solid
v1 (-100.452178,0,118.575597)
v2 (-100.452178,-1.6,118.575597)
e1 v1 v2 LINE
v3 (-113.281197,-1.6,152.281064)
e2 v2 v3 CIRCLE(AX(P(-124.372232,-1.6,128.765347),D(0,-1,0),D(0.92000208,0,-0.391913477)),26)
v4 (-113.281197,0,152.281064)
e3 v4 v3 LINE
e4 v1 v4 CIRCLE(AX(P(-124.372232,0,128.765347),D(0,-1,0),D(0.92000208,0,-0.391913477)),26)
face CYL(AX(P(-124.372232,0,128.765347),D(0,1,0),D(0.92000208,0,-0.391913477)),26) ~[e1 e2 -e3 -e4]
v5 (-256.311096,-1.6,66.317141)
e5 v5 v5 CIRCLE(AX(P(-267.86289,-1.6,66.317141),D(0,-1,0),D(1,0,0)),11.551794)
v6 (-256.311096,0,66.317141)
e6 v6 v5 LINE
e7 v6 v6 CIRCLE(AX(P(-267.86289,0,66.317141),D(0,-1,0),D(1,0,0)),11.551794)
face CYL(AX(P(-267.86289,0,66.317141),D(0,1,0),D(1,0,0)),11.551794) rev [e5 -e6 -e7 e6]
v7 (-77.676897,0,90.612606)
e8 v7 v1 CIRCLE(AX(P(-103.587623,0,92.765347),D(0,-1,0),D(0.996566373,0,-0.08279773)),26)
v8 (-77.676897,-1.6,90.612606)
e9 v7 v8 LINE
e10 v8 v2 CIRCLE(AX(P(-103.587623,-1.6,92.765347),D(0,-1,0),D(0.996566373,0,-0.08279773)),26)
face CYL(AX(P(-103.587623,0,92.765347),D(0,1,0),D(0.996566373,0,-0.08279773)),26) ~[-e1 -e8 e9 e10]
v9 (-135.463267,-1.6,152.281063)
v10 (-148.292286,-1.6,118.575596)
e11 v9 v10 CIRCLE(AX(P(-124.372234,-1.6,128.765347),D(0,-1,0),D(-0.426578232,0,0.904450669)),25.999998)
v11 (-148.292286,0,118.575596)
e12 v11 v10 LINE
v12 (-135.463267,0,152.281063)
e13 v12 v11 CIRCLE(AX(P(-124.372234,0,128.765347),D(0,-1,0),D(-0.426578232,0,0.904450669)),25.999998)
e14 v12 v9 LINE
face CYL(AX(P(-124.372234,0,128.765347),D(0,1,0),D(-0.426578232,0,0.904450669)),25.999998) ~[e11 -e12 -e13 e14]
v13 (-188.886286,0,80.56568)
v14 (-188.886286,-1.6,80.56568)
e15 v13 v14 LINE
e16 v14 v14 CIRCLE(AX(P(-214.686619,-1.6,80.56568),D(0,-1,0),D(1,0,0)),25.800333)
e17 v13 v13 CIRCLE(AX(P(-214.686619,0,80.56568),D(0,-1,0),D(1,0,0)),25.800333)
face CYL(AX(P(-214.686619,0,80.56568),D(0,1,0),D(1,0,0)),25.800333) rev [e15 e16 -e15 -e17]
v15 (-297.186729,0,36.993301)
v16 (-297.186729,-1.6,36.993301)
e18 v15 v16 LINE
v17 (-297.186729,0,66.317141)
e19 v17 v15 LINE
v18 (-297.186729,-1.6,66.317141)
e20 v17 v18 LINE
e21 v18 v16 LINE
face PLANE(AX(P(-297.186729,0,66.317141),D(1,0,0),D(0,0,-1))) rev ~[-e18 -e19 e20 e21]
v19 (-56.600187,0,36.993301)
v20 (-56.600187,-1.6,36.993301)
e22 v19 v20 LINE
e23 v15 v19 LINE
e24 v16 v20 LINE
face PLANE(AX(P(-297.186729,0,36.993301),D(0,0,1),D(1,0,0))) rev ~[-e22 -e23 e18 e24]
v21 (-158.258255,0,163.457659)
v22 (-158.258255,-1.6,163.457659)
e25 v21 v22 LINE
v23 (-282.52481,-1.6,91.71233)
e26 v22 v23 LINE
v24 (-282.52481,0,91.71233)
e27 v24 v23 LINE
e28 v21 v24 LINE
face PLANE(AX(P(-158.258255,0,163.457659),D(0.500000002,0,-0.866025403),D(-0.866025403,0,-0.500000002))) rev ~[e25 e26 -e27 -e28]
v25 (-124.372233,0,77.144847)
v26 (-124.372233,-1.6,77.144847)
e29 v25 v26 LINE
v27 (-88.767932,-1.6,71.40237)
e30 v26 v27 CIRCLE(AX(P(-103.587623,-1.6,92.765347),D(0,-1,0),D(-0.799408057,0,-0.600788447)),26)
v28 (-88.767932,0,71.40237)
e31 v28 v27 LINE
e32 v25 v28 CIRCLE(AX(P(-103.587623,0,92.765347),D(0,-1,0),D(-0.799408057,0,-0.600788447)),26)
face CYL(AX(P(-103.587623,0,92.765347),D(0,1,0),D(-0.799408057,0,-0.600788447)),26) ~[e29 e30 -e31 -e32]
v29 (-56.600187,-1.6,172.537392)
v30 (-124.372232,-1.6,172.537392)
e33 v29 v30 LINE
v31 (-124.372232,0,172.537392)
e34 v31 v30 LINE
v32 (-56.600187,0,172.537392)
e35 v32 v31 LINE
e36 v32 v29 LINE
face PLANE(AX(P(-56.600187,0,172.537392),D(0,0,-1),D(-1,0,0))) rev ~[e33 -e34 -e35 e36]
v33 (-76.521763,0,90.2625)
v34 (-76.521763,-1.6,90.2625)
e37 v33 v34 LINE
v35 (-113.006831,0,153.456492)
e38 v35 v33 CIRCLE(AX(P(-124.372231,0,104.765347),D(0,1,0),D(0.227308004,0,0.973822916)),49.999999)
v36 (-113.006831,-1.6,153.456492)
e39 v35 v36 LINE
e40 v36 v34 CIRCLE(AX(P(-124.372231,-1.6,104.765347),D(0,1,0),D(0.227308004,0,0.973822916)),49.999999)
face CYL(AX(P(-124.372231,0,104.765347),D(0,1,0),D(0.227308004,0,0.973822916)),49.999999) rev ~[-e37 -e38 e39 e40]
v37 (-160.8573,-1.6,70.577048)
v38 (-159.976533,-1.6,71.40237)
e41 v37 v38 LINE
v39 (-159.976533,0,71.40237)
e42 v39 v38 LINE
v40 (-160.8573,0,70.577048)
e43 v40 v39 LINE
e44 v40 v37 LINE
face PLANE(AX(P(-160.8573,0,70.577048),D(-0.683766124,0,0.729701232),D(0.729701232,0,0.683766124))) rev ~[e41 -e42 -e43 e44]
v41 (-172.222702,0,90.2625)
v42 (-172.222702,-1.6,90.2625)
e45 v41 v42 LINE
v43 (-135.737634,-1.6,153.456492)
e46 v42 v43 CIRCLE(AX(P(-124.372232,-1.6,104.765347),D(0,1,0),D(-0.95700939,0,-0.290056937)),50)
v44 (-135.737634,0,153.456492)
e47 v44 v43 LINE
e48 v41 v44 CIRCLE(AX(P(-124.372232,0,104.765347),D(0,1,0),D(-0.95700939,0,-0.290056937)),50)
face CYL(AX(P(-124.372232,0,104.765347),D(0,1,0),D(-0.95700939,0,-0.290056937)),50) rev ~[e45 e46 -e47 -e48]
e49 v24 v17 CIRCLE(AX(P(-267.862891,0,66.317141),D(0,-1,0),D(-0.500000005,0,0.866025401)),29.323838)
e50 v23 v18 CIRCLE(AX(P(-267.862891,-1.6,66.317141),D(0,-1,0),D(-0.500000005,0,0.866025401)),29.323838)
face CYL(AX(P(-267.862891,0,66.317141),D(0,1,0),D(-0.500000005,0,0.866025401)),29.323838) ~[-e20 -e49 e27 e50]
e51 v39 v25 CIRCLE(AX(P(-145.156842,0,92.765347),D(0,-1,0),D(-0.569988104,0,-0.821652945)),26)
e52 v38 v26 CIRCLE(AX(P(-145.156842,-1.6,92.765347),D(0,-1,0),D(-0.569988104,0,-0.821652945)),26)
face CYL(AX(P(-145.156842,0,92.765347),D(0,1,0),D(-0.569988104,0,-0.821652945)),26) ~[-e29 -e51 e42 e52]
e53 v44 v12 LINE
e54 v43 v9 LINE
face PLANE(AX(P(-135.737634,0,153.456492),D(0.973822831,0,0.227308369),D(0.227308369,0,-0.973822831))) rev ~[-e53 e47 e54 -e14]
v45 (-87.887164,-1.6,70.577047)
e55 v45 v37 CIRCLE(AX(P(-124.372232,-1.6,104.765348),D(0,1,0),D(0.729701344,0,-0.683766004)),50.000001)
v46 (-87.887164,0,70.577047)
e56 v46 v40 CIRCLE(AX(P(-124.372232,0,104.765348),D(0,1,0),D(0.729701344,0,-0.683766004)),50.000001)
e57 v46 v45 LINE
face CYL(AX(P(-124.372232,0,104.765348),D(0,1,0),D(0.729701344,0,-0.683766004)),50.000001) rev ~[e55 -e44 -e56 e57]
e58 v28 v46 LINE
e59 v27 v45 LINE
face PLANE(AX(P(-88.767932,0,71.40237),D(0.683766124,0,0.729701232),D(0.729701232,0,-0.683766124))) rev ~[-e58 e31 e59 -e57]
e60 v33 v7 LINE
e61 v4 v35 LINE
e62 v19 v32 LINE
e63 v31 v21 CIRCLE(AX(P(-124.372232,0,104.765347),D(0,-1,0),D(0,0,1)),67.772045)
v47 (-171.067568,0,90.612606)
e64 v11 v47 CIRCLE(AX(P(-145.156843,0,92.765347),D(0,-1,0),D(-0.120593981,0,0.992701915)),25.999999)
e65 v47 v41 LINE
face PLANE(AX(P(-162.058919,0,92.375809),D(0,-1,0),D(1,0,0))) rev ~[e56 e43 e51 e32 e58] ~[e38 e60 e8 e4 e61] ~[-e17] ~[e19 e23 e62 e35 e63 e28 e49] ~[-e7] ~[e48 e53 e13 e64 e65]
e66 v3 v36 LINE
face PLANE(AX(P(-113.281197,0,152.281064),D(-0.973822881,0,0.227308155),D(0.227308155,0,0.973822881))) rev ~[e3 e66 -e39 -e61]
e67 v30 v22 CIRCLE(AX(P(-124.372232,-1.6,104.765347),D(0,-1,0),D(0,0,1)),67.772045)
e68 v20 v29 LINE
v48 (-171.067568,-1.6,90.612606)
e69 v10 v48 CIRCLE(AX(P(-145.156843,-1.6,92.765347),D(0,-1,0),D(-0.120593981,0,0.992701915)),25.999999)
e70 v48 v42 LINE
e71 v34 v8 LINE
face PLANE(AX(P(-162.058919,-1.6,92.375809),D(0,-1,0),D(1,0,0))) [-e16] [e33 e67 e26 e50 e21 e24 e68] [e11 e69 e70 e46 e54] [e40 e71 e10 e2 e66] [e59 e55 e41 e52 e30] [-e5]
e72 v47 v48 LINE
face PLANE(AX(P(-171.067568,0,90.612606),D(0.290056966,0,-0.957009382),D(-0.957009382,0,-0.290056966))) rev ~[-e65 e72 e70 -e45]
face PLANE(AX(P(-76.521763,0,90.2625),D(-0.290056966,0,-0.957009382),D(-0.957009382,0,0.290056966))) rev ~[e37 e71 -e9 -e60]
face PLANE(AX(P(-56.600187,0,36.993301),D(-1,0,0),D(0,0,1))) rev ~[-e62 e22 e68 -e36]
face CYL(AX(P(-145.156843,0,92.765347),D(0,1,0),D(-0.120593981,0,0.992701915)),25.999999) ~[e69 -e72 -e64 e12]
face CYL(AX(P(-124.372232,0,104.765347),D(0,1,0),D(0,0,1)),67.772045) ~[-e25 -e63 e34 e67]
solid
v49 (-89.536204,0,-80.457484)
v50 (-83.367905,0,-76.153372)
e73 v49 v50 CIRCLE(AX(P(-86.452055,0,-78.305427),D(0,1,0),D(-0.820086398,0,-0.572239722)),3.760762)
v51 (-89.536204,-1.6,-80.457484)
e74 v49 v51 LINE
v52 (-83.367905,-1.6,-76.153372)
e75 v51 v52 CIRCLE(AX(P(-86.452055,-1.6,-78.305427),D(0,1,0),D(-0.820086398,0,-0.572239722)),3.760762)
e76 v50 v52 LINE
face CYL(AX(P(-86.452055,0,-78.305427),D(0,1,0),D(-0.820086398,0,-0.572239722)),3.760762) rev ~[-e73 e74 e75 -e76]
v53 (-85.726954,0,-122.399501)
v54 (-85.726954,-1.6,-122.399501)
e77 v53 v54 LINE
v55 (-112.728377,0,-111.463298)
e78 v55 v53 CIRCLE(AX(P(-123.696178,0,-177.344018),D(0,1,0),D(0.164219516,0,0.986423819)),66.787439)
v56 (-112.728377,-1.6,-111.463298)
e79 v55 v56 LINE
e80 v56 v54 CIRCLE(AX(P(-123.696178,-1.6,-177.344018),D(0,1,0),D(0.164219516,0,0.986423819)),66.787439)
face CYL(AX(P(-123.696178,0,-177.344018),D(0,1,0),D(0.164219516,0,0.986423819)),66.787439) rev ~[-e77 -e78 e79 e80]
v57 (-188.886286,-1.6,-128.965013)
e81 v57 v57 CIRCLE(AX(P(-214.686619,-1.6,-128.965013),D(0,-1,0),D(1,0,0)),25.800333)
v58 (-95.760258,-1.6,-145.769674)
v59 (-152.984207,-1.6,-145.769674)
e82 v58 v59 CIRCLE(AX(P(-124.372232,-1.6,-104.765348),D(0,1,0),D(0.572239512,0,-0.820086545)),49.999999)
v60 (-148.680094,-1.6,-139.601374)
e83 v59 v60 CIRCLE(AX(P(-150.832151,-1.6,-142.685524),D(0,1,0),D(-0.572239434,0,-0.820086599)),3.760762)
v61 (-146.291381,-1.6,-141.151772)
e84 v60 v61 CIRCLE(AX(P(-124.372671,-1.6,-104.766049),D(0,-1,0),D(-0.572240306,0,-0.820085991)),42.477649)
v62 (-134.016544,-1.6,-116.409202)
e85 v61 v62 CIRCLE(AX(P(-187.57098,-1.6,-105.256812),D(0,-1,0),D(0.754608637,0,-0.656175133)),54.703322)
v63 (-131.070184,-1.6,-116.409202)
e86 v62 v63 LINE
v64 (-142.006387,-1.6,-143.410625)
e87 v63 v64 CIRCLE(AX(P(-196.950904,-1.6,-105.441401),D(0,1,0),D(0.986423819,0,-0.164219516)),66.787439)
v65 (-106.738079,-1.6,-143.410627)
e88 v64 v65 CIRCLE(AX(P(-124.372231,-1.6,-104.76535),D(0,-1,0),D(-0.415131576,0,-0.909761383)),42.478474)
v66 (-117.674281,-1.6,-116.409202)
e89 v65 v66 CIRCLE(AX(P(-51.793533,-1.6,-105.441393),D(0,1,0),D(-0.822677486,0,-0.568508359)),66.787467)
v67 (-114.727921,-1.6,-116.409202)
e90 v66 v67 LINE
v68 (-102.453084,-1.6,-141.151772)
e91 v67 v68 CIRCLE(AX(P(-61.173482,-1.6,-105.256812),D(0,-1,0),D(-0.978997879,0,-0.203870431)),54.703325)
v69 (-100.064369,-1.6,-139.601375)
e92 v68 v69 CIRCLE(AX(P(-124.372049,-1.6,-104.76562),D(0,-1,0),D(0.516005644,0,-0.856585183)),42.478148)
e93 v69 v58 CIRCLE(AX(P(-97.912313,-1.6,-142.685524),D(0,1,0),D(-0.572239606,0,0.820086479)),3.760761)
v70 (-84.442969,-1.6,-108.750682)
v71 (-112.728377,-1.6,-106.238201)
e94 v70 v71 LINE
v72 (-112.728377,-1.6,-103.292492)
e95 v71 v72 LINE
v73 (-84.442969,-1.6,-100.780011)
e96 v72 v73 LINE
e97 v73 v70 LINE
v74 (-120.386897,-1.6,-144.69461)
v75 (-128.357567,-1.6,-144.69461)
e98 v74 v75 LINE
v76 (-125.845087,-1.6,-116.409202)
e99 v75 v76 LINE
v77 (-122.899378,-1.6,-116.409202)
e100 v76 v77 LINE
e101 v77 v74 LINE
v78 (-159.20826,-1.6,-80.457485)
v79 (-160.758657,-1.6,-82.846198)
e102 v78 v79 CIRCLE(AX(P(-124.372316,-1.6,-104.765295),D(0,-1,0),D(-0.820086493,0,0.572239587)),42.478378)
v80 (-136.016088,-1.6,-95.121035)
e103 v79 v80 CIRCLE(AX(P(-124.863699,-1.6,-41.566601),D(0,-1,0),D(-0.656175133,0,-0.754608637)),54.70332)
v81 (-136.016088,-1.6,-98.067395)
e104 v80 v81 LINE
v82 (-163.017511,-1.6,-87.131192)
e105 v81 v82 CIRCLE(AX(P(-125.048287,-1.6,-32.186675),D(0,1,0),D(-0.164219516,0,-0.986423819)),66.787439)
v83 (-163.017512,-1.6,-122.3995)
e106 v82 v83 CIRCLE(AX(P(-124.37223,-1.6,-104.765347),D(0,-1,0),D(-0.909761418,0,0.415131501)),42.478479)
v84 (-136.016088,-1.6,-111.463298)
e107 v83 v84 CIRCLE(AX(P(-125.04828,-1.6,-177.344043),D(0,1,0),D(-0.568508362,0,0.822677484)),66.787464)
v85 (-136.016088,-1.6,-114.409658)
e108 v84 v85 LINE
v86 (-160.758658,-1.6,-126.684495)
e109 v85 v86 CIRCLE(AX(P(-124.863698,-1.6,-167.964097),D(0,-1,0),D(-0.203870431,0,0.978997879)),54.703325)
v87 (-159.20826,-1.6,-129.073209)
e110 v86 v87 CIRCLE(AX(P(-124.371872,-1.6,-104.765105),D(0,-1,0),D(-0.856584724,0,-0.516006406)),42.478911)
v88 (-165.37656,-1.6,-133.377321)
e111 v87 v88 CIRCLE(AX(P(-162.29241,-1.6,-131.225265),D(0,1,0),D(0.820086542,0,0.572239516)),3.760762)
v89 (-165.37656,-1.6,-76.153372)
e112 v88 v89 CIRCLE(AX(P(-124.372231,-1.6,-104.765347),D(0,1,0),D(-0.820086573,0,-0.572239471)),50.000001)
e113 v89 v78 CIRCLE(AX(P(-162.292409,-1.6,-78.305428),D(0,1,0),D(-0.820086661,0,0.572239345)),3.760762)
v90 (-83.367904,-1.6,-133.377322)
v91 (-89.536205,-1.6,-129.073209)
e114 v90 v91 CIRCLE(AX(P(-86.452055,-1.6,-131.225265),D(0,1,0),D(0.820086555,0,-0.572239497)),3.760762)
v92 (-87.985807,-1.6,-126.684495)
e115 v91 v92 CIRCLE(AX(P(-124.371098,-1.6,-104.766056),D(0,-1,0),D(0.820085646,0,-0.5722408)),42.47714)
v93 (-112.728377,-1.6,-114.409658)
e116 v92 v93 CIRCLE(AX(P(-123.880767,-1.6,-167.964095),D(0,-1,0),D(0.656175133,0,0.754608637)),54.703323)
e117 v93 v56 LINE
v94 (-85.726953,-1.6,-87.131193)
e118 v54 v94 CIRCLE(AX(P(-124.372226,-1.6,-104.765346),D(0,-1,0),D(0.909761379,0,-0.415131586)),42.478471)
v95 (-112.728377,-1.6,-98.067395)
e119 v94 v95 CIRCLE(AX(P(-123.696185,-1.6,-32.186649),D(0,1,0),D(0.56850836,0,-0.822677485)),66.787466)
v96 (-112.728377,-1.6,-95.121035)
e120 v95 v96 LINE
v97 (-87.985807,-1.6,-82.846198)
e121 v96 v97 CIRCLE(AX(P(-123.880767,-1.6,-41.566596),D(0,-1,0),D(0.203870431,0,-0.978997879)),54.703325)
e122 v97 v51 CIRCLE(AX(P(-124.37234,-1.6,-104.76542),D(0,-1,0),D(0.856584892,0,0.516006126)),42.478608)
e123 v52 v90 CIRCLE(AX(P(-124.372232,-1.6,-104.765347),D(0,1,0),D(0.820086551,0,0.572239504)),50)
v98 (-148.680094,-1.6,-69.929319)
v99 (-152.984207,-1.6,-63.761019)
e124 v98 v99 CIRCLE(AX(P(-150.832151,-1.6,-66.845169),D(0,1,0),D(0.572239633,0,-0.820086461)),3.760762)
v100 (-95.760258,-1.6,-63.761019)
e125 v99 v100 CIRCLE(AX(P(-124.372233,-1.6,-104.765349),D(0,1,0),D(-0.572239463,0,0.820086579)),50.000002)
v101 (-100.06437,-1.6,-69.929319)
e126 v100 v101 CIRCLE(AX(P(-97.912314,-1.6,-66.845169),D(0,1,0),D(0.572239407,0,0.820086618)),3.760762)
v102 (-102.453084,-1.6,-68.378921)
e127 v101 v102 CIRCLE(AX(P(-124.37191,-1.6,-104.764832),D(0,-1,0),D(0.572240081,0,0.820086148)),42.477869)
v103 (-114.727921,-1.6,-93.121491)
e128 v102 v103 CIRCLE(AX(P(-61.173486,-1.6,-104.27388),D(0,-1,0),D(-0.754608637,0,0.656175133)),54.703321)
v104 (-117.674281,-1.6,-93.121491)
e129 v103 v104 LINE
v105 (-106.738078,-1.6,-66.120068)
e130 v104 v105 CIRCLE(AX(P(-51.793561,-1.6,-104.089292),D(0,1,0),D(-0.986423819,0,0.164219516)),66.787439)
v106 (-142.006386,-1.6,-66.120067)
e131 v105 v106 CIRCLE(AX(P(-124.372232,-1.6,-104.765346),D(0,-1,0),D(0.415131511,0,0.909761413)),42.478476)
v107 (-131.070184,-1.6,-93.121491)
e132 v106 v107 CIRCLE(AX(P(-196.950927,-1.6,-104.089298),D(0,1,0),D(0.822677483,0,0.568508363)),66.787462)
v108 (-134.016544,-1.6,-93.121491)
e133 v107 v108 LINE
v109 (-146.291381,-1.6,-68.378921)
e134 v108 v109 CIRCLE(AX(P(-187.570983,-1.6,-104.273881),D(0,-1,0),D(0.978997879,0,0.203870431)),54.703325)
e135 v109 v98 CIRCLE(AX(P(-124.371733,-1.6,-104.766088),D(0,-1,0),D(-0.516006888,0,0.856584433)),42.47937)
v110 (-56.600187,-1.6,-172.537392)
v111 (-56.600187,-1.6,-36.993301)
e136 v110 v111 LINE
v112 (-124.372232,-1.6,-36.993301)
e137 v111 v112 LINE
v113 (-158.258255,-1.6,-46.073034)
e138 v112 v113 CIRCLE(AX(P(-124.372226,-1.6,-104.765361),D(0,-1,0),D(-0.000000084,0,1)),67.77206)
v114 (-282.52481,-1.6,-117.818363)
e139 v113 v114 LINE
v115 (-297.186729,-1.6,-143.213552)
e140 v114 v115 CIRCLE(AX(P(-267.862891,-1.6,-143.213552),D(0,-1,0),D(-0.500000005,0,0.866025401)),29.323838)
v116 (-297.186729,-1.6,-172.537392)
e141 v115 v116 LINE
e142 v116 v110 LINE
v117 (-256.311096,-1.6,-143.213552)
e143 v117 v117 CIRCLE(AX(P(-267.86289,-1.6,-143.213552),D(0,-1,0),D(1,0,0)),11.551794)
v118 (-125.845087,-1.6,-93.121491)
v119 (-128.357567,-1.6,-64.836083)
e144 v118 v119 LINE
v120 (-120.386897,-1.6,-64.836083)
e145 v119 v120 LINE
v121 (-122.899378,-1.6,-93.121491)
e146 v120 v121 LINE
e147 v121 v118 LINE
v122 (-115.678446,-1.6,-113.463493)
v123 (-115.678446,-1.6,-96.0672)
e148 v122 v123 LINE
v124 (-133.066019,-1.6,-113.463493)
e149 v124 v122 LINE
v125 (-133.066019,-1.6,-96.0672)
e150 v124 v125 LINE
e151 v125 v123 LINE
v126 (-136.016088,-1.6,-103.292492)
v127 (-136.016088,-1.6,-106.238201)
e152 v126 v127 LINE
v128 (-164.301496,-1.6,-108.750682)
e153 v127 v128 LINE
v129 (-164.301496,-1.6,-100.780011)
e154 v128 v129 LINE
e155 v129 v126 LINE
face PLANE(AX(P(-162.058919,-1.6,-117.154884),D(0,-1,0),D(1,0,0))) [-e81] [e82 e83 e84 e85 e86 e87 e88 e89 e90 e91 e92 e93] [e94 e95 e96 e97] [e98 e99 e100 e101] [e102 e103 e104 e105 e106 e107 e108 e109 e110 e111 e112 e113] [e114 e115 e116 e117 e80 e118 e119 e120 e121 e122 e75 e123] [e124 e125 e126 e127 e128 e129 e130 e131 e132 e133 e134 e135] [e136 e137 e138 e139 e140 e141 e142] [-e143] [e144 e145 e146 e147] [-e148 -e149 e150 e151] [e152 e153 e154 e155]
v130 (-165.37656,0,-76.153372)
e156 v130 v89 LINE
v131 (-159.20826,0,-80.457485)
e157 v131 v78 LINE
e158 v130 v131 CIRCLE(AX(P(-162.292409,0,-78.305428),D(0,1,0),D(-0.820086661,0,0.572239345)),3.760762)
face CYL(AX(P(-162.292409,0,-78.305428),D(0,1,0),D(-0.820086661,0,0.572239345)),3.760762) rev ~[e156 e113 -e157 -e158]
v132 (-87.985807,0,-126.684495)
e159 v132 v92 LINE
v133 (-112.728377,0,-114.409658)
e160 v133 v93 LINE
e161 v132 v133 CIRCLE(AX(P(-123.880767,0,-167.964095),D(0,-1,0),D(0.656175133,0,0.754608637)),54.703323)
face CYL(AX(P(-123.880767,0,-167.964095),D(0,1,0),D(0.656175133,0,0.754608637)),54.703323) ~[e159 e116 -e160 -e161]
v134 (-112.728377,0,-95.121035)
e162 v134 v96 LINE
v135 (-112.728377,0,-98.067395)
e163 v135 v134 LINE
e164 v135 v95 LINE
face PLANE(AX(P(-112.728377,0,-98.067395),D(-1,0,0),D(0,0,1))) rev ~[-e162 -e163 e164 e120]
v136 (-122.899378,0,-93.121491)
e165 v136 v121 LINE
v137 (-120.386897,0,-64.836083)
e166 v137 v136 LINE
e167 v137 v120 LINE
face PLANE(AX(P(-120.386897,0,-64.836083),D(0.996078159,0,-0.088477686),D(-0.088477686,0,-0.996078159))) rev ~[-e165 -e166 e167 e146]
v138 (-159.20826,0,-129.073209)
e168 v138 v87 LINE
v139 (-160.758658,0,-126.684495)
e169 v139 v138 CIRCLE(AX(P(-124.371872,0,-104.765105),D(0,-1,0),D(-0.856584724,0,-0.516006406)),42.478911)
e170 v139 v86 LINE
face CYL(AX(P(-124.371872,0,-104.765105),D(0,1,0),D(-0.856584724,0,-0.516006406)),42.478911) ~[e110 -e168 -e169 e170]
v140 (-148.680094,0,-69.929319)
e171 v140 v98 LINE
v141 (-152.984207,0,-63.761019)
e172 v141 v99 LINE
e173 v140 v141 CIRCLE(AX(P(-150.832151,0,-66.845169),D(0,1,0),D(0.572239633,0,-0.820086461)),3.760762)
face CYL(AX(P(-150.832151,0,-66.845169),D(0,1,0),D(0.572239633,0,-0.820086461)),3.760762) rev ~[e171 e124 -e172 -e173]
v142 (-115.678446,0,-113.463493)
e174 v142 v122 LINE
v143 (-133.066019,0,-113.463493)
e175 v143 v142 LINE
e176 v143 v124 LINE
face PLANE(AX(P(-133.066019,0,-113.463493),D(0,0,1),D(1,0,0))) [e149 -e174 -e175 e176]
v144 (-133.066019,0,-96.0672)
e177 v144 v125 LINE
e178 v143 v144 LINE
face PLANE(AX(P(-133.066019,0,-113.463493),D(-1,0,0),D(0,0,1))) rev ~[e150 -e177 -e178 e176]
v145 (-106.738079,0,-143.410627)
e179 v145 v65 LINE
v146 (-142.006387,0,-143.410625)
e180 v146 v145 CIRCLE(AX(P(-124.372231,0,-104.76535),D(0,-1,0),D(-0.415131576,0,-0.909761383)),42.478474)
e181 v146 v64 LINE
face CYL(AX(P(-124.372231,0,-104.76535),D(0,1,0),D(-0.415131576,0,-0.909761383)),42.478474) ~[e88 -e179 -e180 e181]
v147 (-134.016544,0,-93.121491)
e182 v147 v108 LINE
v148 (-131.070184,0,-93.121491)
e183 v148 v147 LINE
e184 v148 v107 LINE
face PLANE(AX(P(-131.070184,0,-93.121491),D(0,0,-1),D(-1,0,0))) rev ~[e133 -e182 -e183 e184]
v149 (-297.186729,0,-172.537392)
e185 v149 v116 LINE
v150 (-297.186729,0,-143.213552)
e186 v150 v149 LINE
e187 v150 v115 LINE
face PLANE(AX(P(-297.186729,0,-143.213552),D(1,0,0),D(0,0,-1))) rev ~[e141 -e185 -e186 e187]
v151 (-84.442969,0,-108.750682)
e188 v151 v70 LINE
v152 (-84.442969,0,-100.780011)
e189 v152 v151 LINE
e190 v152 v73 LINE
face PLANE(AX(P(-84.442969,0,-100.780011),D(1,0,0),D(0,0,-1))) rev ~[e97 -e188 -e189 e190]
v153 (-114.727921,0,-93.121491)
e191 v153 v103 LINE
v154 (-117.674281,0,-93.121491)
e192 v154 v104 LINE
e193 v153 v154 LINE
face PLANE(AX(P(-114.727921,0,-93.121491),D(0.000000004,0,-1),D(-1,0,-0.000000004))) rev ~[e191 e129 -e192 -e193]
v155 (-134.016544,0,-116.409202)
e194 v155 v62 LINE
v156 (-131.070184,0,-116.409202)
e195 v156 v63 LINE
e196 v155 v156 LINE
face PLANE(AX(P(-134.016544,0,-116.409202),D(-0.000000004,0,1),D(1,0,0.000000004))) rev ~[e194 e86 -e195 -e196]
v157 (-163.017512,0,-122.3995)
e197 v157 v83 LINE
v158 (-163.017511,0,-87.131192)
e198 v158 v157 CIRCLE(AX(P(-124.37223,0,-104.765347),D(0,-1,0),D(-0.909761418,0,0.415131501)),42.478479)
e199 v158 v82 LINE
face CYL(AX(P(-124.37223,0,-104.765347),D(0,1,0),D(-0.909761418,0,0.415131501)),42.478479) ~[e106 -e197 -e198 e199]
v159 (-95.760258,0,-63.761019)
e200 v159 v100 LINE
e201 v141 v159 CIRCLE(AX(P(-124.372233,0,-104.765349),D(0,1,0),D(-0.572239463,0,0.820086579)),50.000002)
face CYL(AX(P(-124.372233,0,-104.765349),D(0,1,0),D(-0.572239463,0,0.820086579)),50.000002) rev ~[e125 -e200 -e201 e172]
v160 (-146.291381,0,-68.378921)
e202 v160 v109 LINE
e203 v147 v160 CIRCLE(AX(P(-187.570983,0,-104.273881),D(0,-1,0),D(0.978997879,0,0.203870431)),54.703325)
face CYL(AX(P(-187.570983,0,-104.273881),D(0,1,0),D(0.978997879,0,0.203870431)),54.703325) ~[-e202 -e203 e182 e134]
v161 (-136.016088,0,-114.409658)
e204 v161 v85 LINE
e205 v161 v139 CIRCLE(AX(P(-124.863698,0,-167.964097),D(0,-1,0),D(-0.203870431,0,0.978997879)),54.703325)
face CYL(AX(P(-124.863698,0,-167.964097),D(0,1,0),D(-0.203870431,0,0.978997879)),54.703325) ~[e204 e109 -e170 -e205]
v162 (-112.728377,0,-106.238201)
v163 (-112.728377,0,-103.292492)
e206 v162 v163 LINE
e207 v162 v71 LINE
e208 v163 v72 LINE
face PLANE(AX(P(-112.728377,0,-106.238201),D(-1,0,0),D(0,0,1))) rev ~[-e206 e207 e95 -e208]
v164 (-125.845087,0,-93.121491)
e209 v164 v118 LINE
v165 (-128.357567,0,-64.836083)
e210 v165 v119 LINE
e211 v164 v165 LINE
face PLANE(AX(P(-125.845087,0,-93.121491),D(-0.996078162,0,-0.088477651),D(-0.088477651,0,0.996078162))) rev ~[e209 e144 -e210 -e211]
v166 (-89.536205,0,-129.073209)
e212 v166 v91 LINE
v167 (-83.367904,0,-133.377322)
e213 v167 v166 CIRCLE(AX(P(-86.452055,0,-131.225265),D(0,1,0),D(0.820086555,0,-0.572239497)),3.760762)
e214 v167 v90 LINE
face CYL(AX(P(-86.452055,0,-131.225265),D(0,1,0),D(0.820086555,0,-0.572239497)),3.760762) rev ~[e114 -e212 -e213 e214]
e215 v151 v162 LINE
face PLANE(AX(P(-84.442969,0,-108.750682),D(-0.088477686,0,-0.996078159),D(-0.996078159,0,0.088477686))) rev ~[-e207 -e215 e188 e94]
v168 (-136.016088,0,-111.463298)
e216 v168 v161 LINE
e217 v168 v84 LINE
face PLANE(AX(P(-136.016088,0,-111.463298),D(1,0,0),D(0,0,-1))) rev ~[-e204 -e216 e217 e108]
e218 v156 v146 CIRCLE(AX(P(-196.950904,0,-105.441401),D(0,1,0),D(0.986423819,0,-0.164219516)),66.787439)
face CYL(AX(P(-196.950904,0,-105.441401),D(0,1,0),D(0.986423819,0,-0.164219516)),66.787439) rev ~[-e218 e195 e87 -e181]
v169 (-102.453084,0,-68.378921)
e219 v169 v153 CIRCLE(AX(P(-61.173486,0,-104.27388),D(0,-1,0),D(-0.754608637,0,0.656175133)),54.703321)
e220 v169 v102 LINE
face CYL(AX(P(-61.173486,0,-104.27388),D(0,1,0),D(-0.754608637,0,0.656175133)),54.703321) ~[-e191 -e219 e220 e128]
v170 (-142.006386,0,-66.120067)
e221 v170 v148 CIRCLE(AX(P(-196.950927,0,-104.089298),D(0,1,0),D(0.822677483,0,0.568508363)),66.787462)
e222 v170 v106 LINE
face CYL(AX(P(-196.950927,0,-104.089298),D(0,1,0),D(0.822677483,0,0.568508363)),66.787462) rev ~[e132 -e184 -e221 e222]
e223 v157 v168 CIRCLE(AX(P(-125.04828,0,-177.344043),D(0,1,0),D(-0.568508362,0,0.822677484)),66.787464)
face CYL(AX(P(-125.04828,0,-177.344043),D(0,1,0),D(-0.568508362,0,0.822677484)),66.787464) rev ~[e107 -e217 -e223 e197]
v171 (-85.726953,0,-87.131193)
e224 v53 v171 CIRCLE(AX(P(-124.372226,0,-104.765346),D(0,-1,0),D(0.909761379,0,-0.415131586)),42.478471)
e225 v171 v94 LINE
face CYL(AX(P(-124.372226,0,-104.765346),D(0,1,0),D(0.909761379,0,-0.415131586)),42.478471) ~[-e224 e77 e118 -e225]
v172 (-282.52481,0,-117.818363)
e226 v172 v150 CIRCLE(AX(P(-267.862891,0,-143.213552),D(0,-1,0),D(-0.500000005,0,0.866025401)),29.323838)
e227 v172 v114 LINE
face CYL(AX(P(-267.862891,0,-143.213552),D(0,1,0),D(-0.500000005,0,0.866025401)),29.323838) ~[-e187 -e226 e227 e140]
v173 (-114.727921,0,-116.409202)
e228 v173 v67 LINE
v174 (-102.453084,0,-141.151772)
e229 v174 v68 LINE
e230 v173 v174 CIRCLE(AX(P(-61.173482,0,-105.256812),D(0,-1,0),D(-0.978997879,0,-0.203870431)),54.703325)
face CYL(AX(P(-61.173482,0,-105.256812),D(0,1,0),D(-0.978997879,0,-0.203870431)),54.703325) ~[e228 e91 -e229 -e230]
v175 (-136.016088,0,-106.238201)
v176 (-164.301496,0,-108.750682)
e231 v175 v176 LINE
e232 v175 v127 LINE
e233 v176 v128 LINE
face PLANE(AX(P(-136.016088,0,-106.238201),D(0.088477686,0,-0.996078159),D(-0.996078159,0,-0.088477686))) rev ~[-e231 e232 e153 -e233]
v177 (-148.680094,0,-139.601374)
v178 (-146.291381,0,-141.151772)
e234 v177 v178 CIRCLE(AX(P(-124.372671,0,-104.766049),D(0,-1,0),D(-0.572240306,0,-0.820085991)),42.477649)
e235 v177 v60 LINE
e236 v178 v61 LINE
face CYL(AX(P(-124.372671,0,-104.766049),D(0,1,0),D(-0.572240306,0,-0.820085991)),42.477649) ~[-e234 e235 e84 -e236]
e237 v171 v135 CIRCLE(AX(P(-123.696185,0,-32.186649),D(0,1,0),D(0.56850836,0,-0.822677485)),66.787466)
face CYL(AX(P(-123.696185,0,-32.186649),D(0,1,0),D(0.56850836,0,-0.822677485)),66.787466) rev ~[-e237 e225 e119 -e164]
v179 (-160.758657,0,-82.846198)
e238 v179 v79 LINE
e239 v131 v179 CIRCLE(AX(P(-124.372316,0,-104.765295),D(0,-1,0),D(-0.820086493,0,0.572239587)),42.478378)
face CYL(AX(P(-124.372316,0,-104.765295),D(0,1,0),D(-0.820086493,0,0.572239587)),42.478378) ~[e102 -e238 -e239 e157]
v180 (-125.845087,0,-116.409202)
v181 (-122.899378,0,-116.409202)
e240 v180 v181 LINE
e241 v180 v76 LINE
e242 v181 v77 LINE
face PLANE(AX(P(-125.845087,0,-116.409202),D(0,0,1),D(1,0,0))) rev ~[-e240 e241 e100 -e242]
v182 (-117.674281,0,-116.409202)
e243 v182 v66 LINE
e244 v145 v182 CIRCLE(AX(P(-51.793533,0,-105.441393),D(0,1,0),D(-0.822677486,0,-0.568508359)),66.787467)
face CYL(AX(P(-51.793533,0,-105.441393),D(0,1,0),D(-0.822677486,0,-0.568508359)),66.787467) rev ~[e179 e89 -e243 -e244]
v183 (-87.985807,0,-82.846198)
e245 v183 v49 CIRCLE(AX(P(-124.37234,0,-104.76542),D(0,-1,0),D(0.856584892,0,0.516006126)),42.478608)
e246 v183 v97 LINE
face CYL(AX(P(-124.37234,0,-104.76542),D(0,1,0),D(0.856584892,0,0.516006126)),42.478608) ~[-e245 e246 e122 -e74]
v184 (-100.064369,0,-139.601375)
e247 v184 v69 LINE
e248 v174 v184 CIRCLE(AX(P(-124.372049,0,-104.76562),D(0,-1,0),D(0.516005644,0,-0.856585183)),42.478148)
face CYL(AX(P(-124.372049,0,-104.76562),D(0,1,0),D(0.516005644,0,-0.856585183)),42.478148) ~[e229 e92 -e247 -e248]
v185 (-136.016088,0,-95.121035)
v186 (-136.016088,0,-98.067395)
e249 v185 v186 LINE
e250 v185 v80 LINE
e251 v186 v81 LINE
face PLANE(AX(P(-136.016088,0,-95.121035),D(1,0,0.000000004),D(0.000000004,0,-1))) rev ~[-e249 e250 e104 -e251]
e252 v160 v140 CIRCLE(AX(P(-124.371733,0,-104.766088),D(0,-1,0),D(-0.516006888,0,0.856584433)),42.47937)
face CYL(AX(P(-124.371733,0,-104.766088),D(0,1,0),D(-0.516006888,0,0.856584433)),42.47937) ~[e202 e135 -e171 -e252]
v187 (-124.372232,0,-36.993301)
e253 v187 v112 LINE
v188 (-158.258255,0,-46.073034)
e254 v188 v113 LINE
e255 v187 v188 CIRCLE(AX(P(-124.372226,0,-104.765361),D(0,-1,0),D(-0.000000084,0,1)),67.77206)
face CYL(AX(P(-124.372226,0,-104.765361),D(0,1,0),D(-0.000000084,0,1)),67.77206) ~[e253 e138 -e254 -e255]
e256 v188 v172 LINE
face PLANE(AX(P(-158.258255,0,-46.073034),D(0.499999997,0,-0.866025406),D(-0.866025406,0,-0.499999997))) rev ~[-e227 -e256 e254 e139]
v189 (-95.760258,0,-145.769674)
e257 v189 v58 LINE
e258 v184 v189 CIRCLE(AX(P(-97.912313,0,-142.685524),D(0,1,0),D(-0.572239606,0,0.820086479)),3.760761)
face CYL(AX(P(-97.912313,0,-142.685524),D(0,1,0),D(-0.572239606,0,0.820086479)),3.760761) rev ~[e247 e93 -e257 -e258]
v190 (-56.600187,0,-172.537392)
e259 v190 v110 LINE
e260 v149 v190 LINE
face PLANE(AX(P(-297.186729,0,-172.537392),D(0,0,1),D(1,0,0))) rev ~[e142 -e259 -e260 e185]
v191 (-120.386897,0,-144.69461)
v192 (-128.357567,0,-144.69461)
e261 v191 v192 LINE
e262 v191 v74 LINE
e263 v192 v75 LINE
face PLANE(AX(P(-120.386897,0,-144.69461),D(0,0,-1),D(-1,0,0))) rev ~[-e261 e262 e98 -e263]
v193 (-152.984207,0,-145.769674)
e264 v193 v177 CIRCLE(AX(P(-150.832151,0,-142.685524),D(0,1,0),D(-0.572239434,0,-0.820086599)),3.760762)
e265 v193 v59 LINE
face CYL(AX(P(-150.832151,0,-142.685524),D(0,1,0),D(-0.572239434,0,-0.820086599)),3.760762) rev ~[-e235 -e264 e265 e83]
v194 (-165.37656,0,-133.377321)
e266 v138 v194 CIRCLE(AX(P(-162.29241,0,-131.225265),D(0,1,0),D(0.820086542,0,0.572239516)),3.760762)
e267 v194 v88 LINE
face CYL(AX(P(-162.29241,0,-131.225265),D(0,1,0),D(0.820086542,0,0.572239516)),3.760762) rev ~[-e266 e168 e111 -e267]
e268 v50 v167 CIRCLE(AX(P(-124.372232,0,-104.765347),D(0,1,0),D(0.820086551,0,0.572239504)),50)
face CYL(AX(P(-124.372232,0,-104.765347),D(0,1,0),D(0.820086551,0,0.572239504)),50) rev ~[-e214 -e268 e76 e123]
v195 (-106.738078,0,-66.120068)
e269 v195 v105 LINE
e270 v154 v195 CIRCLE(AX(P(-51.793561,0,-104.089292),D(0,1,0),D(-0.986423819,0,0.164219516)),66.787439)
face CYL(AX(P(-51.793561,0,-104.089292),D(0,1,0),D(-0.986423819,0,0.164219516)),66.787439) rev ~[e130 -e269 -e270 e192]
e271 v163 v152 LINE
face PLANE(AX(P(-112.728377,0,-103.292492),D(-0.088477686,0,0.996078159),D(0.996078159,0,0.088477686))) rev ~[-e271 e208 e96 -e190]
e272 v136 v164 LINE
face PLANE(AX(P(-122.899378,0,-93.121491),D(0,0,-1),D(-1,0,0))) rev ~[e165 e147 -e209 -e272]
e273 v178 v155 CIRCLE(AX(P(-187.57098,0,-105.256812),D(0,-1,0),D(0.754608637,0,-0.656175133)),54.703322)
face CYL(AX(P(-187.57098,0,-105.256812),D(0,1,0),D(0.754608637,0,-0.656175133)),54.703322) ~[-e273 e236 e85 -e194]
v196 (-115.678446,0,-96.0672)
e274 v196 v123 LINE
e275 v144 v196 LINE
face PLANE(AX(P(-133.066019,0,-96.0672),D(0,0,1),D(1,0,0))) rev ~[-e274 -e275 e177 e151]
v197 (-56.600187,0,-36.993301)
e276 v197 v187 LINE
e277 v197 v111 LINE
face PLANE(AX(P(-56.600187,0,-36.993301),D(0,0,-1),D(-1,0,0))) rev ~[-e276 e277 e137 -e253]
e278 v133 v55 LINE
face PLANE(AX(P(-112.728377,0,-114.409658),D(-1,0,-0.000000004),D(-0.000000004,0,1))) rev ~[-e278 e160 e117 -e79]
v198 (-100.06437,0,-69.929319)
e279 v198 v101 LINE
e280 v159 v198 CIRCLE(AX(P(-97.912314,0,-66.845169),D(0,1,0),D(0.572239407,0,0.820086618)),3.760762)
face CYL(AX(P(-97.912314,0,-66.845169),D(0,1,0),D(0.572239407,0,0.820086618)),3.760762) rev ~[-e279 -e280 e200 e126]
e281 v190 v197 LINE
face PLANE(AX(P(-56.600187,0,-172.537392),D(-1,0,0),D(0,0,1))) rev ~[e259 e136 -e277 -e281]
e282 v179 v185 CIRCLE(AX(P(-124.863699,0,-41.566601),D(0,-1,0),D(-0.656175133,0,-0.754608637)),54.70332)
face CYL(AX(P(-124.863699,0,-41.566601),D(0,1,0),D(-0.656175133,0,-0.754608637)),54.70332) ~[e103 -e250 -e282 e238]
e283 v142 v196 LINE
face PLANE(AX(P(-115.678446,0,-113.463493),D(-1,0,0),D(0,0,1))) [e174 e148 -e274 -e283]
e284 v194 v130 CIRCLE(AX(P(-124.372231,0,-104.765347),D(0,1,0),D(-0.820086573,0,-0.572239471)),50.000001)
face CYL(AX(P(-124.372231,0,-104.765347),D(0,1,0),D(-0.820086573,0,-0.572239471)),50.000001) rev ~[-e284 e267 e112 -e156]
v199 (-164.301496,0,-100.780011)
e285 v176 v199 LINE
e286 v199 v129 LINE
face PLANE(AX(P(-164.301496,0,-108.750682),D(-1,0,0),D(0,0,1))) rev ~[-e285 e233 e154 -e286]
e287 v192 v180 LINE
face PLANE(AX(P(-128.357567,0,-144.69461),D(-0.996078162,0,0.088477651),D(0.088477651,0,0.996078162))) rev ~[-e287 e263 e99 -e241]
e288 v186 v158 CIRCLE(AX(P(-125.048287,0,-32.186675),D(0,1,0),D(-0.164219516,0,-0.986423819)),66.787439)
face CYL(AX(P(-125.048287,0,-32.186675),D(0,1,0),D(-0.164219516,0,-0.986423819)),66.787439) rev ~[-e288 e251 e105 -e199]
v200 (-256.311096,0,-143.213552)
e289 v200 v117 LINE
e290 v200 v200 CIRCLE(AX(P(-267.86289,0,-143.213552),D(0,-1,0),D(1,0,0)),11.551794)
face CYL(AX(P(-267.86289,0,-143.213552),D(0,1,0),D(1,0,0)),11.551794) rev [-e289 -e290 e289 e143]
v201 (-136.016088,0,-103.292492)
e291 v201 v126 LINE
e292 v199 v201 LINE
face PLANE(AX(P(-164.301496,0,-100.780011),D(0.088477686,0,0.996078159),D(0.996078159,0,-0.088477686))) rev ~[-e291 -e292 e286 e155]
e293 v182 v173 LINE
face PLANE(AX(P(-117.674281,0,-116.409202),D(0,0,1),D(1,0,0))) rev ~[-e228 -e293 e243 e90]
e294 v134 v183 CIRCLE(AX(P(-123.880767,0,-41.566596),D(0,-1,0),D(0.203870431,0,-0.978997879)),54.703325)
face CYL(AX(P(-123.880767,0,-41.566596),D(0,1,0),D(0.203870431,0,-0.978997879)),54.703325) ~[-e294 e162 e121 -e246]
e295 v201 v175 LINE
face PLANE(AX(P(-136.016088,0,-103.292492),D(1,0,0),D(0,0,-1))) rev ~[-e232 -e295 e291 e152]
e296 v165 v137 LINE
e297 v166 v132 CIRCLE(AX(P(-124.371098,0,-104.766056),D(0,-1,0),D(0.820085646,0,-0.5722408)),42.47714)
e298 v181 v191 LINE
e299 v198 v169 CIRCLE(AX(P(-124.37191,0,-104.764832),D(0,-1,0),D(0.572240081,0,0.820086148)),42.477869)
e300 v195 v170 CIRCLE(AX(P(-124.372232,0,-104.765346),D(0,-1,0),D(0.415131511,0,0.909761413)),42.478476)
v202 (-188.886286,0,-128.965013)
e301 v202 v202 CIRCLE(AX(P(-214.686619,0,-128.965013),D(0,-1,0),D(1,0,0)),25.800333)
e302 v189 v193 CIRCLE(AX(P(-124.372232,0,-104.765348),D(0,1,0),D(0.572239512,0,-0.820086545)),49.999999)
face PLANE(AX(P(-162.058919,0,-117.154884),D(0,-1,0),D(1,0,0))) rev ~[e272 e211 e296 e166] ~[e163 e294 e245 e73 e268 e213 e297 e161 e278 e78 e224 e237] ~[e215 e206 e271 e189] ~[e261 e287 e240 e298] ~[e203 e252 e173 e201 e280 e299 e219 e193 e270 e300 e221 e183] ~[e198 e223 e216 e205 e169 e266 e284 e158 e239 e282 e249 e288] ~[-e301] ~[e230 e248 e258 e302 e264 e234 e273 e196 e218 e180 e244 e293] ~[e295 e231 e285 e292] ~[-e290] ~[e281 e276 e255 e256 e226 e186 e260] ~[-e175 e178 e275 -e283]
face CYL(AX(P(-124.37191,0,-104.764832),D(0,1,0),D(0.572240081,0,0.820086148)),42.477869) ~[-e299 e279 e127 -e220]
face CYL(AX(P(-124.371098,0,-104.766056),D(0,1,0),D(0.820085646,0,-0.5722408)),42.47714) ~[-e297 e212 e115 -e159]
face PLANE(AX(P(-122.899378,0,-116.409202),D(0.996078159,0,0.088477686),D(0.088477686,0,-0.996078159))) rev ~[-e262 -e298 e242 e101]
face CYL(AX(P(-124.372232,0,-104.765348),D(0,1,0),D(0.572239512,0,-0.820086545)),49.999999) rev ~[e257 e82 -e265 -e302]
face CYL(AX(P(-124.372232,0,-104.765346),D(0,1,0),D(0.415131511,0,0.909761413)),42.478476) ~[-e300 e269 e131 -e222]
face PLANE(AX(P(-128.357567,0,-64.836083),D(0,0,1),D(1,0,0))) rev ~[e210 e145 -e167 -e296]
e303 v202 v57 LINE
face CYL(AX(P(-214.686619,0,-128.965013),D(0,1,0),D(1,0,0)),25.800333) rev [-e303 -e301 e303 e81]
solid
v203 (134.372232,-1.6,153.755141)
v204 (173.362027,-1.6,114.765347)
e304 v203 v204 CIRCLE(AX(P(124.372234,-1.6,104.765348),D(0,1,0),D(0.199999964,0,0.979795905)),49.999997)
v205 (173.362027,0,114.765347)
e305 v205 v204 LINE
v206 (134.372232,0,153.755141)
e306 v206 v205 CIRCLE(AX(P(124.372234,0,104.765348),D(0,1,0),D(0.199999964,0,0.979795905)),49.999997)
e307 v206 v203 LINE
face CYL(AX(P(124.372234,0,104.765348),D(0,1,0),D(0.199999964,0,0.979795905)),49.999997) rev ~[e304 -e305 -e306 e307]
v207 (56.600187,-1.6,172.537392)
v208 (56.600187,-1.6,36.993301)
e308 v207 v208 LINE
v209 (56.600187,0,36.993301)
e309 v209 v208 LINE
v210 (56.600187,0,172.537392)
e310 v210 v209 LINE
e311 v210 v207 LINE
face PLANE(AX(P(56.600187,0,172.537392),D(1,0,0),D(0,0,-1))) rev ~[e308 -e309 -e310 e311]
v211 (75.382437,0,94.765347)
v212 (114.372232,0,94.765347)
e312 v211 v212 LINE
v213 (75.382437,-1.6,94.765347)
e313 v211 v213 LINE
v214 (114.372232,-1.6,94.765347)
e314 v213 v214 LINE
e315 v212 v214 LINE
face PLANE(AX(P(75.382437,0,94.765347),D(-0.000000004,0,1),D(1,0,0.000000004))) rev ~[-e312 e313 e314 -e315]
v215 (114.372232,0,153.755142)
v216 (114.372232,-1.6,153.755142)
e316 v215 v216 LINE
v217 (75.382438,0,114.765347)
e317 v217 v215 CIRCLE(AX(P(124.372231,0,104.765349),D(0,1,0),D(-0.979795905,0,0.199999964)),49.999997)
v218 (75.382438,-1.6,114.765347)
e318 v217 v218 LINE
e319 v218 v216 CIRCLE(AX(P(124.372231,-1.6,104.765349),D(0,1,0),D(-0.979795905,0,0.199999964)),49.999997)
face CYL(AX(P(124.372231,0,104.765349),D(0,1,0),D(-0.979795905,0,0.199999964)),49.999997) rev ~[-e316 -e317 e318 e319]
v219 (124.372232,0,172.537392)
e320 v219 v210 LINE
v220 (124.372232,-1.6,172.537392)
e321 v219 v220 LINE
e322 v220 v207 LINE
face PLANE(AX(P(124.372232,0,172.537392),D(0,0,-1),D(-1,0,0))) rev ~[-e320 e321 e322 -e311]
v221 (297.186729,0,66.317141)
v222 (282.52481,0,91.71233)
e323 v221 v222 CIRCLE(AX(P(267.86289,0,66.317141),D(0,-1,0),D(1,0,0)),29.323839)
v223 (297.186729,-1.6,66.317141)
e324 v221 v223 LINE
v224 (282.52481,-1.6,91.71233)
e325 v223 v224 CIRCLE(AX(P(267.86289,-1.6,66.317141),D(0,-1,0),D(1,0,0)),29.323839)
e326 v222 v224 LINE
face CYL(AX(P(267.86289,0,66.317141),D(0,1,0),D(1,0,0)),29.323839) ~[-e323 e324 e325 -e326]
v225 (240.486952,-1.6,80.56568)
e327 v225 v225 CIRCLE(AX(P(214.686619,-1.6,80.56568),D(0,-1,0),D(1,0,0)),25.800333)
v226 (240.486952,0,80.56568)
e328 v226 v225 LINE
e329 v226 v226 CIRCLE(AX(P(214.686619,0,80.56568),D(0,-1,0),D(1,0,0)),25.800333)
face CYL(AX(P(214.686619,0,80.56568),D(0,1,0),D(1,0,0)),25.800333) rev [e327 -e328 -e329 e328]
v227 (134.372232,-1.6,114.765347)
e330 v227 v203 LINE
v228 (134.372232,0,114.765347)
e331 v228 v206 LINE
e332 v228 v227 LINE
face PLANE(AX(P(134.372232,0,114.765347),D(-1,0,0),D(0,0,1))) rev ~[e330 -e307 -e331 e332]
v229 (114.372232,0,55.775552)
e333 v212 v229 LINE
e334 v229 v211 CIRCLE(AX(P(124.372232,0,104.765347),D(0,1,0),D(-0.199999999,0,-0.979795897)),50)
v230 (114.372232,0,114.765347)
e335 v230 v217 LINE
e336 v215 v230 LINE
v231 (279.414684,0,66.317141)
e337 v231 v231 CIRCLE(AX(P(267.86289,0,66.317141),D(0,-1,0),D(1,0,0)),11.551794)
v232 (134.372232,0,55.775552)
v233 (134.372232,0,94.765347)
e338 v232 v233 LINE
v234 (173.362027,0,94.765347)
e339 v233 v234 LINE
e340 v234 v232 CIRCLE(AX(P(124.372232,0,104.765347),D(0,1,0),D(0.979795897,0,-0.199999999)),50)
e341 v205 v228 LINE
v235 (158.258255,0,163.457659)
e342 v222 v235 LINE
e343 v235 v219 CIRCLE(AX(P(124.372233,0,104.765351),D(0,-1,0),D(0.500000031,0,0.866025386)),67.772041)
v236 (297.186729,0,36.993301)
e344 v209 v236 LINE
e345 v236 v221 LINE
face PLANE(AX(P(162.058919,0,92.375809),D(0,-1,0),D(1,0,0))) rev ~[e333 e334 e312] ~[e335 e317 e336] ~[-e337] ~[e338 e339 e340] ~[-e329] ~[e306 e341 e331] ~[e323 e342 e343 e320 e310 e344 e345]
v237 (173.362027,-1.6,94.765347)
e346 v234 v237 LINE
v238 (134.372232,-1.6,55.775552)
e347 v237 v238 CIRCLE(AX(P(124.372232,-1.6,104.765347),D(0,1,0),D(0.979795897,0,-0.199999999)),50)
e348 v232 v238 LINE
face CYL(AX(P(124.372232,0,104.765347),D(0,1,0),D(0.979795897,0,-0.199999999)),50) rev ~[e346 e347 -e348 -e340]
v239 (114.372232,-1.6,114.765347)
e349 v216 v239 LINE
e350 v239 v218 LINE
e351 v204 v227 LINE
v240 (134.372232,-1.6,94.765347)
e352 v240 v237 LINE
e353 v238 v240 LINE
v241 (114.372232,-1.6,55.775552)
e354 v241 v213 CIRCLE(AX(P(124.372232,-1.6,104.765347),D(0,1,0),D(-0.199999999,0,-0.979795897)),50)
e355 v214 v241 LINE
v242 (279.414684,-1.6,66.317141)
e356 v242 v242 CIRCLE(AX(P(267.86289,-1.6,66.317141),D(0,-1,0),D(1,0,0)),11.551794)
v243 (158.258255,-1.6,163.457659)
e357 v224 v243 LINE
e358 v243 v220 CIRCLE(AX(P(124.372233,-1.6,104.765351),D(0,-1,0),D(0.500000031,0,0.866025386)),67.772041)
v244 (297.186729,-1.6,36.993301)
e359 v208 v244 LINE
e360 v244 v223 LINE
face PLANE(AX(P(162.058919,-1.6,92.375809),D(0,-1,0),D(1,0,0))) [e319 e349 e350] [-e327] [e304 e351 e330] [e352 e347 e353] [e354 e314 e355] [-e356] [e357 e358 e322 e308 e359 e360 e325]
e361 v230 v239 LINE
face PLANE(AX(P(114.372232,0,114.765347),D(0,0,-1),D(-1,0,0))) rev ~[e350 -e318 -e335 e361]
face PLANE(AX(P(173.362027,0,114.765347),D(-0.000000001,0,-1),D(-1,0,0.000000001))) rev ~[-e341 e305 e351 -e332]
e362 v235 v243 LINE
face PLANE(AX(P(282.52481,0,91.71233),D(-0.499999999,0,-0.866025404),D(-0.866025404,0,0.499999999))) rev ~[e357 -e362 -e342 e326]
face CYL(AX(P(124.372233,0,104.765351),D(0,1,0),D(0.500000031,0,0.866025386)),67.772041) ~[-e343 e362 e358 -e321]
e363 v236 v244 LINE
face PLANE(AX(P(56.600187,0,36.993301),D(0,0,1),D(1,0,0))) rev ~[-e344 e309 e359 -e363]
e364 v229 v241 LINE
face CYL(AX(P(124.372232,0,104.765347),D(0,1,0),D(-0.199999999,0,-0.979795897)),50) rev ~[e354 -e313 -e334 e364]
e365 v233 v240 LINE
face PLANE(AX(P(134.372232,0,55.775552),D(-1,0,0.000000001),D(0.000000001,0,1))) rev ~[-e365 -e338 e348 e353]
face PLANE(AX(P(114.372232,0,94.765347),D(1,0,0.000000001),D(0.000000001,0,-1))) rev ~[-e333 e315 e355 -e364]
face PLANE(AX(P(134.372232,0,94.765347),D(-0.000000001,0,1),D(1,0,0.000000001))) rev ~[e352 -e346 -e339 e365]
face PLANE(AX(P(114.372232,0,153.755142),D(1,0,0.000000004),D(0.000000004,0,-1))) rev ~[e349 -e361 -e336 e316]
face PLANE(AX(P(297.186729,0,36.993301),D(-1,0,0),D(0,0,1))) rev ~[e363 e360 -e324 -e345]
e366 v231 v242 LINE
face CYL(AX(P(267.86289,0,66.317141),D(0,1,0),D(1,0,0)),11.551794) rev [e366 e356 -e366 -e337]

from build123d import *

# Parameters (mm, degrees)
F0_R     = 11.551794
F0_R_2   = 25.800333
F1_DEPTH = 1.6
F2_DEPTH = 1.6
F0_W     = 17.387573
F0_H     = 17.396293
F3_DEPTH = 1.6


# Not quite as in the source:
# - ends of sketch curves that miss each other by under 0.0002 mm in the source are joined


with BuildPart() as f1:
    # F0 (on Front) → F1 (new body)
    with BuildSketch(Plane.XZ):
        with BuildLine():
            Line((-297.186729, 36.993301), (-56.600187, 36.993301))
            Line((-56.600187, 36.993301), (-56.600187, 172.537392))
            Line((-56.600187, 172.537392), (-124.372232, 172.537392))
            ThreePointArc((-124.372232, 172.537392), (-141.9129283344, 170.2281154687), (-158.2582551506, 163.4576592608))
            Line((-158.2582551506, 163.4576592608), (-282.52481, 91.71233))
            ThreePointArc((-282.52481, 91.71233), (-293.2580796825, 80.979060202), (-297.186729, 66.317141))
            Line((-297.186729, 66.317141), (-297.186729, 36.993301))
        make_face()
        with Locations((-267.86289, 66.317141)):
            Circle(F0_R, mode=Mode.SUBTRACT)
        with Locations((-214.686619, 80.56568)):
            Circle(F0_R_2, mode=Mode.SUBTRACT)
        with BuildLine():
            ThreePointArc((-159.9765326971, 71.4023704367), (-141.016905476, 67.0970606221), (-124.3722325089, 77.1448473824))
            ThreePointArc((-124.3722325089, 77.1448473824), (-107.7275592275, 67.0970605743), (-88.7679323029, 71.4023704367))
            Line((-88.7679323029, 71.4023704367), (-87.887164, 70.577047))
            ThreePointArc((-87.887164, 70.577047), (-124.3722323419, 54.765347), (-160.8573001475, 70.5770477988))
            Line((-160.8573001475, 70.5770477988), (-159.9765326971, 71.4023704367))
        make_face(mode=Mode.SUBTRACT)
        with BuildLine():
            ThreePointArc((-172.2227015184, 90.262500146), (-167.6735024781, 129.7653464996), (-135.7376340818, 153.4564923503))
            Line((-135.7376340818, 153.4564923503), (-135.463267, 152.281063))
            ThreePointArc((-135.463267, 152.281063), (-148.6715885036, 138.0141995511), (-148.2922859978, 118.5755964269))
            ThreePointArc((-148.2922859978, 118.5755964269), (-165.3162621194, 109.1847800125), (-171.0675676999, 90.6126060249))
            Line((-171.0675676999, 90.6126060249), (-172.2227015184, 90.262500146))
        make_face(mode=Mode.SUBTRACT)
        with BuildLine():
            ThreePointArc((-77.6768973001, 90.6126060249), (-83.4282028806, 109.1847800125), (-100.4521779276, 118.5755965958))
            ThreePointArc((-100.4521779276, 118.5755965958), (-100.0728755876, 138.0141997906), (-113.2811974601, 152.2810641448))
            Line((-113.2811974601, 152.2810641448), (-113.006831, 153.456492))
            ThreePointArc((-113.006831, 153.456492), (-81.0709616928, 129.7653467957), (-76.5217625658, 90.2624998684))
            Line((-76.5217625658, 90.2624998684), (-77.6768973001, 90.6126060249))
        make_face(mode=Mode.SUBTRACT)
    extrude(amount=F1_DEPTH)


with BuildPart() as f2:
    # F0 (on Front) → F2 (new body)
    with BuildSketch(Plane.XZ):
        with BuildLine():
            ThreePointArc((297.186729, 66.317141), (293.2580796825, 80.979060202), (282.524810096, 91.7123301664))
            Line((282.524810096, 91.7123301664), (158.258255, 163.457659))
            ThreePointArc((158.258255, 163.457659), (141.9129283344, 170.2281154687), (124.372232, 172.537392))
            Line((124.372232, 172.537392), (56.600187, 172.537392))
            Line((56.600187, 172.537392), (56.600187, 36.993301))
            Line((56.600187, 36.993301), (297.186729, 36.993301))
            Line((297.186729, 36.993301), (297.186729, 66.317141))
        make_face()
        with BuildLine():
            ThreePointArc((114.3722320283, 55.7755521386), (89.0168930114, 69.41000787), (75.3824371786, 94.7653468323))
            Line((75.3824371786, 94.7653468323), (114.372232, 94.765347))
            Line((114.372232, 94.765347), (114.3722320283, 55.7755521386))
        make_face(mode=Mode.SUBTRACT)
        with BuildLine():
            ThreePointArc((173.3620268614, 94.7653470283), (159.7275710593, 69.4100079407), (134.3722319717, 55.7755521386))
            Line((134.3722319717, 55.7755521386), (134.372232, 94.765347))
            Line((134.372232, 94.765347), (173.3620268614, 94.7653470283))
        make_face(mode=Mode.SUBTRACT)
        with Locations((214.686619, 80.56568)):
            Circle(F0_R_2, mode=Mode.SUBTRACT)
        with Locations((267.86289, 66.317141)):
            Circle(F0_R, mode=Mode.SUBTRACT)
        with BuildLine():
            Line((114.372232, 114.765347), (75.382438, 114.765347))
            ThreePointArc((75.382438, 114.765347), (89.0168929407, 140.1206860593), (114.3722318323, 153.7551418214))
            Line((114.3722318323, 153.7551418214), (114.372232, 114.765347))
        make_face(mode=Mode.SUBTRACT)
        with BuildLine():
            Line((134.372232, 114.765347), (134.372232, 153.755141))
            ThreePointArc((134.372232, 153.755141), (159.72757113, 140.1206859886), (173.3620268614, 114.7653469717))
            Line((173.3620268614, 114.7653469717), (134.372232, 114.765347))
        make_face(mode=Mode.SUBTRACT)
    extrude(amount=F2_DEPTH)


with BuildPart() as f3:
    # F0 (on Front) → F3 (new body)
    with BuildSketch(Plane.XZ):
        with BuildLine():
            Line((-297.186729, -172.537392), (-56.600187, -172.537392))
            Line((-56.600187, -172.537392), (-56.600187, -36.993301))
            Line((-56.600187, -36.993301), (-124.372232, -36.993301))
            ThreePointArc((-124.372232, -36.993301), (-141.9129280929, -39.3025784666), (-158.2582547176, -46.0730344892))
            Line((-158.2582547176, -46.0730344892), (-282.52481, -117.818363))
            ThreePointArc((-282.52481, -117.818363), (-293.2580796825, -128.551632798), (-297.186729, -143.213552))
            Line((-297.186729, -143.213552), (-297.186729, -172.537392))
        make_face()
        with Locations((-267.86289, -143.213552)):
            Circle(F0_R, mode=Mode.SUBTRACT)
        with Locations((-214.686619, -128.965013)):
            Circle(F0_R_2, mode=Mode.SUBTRACT)
        with BuildLine():
            Line((-136.016088, -111.463298), (-136.016088, -114.409658))
            ThreePointArc((-136.016088, -114.409658), (-149.1748311091, -118.9597856001), (-160.7586581585, -126.6844948177))
            ThreePointArc((-160.7586581585, -126.6844948177), (-160.0034818521, -127.891847864), (-159.2082600619, -129.0732090432))
            ThreePointArc((-159.2082600619, -129.0732090432), (-160.1403536522, -134.3094154984), (-165.3765604984, -133.3773213478))
            ThreePointArc((-165.3765604984, -133.3773213478), (-174.372232, -104.76534659), (-165.3765597693, -76.153372161))
            ThreePointArc((-165.3765597693, -76.153372161), (-160.140353316, -75.2212777363), (-159.2082599709, -80.4574850203))
            ThreePointArc((-159.2082599709, -80.4574850203), (-160.003481619, -81.6388457767), (-160.7586571763, -82.8461984962))
            ThreePointArc((-160.7586571763, -82.8461984962), (-149.1748311091, -90.5709073999), (-136.0160880125, -95.1210350602))
            Line((-136.0160880125, -95.1210350602), (-136.016088, -98.067395))
            ThreePointArc((-136.016088, -98.067395), (-150.1203481061, -94.0894510681), (-163.0175112983, -87.1311919846))
            ThreePointArc((-163.0175112983, -87.1311919846), (-166.850709, -104.7653465451), (-163.0175118922, -122.3994999508))
            ThreePointArc((-163.0175118922, -122.3994999508), (-150.1203481061, -115.4412419319), (-136.016088, -111.463298))
        make_face(mode=Mode.SUBTRACT)
        Polygon((-136.016088, -106.238201), (-164.301496, -108.750682), (-164.301496, -100.780011), (-136.016088, -103.292492), align=None, mode=Mode.SUBTRACT)
        with BuildLine():
            Line((-117.674281, -116.409202), (-114.727921, -116.409202))
            ThreePointArc((-114.727921, -116.409202), (-110.1777933999, -129.5679451091), (-102.4530841823, -141.1517721585))
            ThreePointArc((-102.4530841823, -141.1517721585), (-101.2457306796, -140.3965965559), (-100.0643694875, -139.6013747344))
            ThreePointArc((-100.0643694875, -139.6013747344), (-94.8281635016, -140.5334676522), (-95.7602576522, -145.7696744984))
            ThreePointArc((-95.7602576522, -145.7696744984), (-124.37223241, -154.765347), (-152.9842073083, -145.7696744418))
            ThreePointArc((-152.9842073083, -145.7696744418), (-153.9163012637, -140.533467316), (-148.6800939797, -139.6013739709))
            ThreePointArc((-148.6800939797, -139.6013739709), (-147.4987336797, -140.3965963227), (-146.2913809458, -141.15177191))
            ThreePointArc((-146.2913809458, -141.15177191), (-138.5666716001, -129.5679451091), (-134.0165439398, -116.4092020125))
            Line((-134.0165439398, -116.4092020125), (-131.070184, -116.409202))
            ThreePointArc((-131.070184, -116.409202), (-135.0481279319, -130.5134621061), (-142.0063870154, -143.4106252983))
            ThreePointArc((-142.0063870154, -143.4106252983), (-124.3722324549, -147.243824), (-106.7380786715, -143.4106267199))
            ThreePointArc((-106.7380786715, -143.4106267199), (-113.6963370681, -130.5134621061), (-117.674281, -116.409202))
        make_face(mode=Mode.SUBTRACT)
        Polygon((-122.899378, -116.409202), (-120.386897, -144.69461), (-128.357567, -144.69461), (-125.845087, -116.409202), align=None, mode=Mode.SUBTRACT)
        with Locations((-124.3722325, -104.7653465)):
            Rectangle(F0_W, F0_H, mode=Mode.SUBTRACT)
        Polygon((-112.728377, -103.292492), (-84.442969, -100.780011), (-84.442969, -108.750682), (-112.728377, -106.238201), align=None, mode=Mode.SUBTRACT)
        with BuildLine():
            Line((-112.728377, -98.067395), (-112.728377, -95.121035))
            ThreePointArc((-112.728377, -95.121035), (-99.5696338909, -90.5709073999), (-87.9858068415, -82.8461981823))
            ThreePointArc((-87.9858068415, -82.8461981823), (-88.7409826773, -81.6388453203), (-89.5362042656, -80.4574844875))
            ThreePointArc((-89.5362042656, -80.4574844875), (-88.604111684, -75.2212777363), (-83.3679045016, -76.1533716522))
            ThreePointArc((-83.3679045016, -76.1533716522), (-74.372232, -104.76534659), (-83.3679040889, -133.3773216358))
            ThreePointArc((-83.3679040889, -133.3773216358), (-88.6041113478, -134.3094154984), (-89.5362054984, -129.0732086522))
            ThreePointArc((-89.5362054984, -129.0732086522), (-88.7409824441, -127.8918483204), (-87.985806648, -126.6844952121))
            ThreePointArc((-87.985806648, -126.6844952121), (-99.5696338909, -118.9597856001), (-112.7283769875, -114.4096579398))
            Line((-112.7283769875, -114.4096579398), (-112.728377, -111.463298))
            ThreePointArc((-112.728377, -111.463298), (-98.6241168939, -115.4412419319), (-85.7269537017, -122.3995010154))
            ThreePointArc((-85.7269537017, -122.3995010154), (-81.893755, -104.7653465451), (-85.7269526578, -87.1311928439))
            ThreePointArc((-85.7269526578, -87.1311928439), (-98.6241168939, -94.0894510681), (-112.728377, -98.067395))
        make_face(mode=Mode.SUBTRACT)
        Polygon((-125.845087, -93.121491), (-128.357567, -64.836083), (-120.386897, -64.836083), (-122.899378, -93.121491), align=None, mode=Mode.SUBTRACT)
        with BuildLine():
            Line((-131.070184, -93.121491), (-134.016544, -93.121491))
            ThreePointArc((-134.016544, -93.121491), (-138.5666716001, -79.9627478909), (-146.2913808177, -68.3789208415))
            ThreePointArc((-146.2913808177, -68.3789208415), (-147.4987332233, -69.134097381), (-148.6800940432, -69.9293189381))
            ThreePointArc((-148.6800940432, -69.9293189381), (-153.9163012637, -68.997225684), (-152.9842073478, -63.7610185016))
            ThreePointArc((-152.9842073478, -63.7610185016), (-124.37223241, -54.765347), (-95.7602578335, -63.7610187614))
            ThreePointArc((-95.7602578335, -63.7610187614), (-94.8281635016, -68.9972253478), (-100.0643703478, -69.9293194984))
            ThreePointArc((-100.0643703478, -69.9293194984), (-101.245731136, -69.1340971479), (-102.45308423, -68.3789213817))
            ThreePointArc((-102.45308423, -68.3789213817), (-110.1777933999, -79.9627478909), (-114.7279210602, -93.1214909875))
            Line((-114.7279210602, -93.1214909875), (-117.674281, -93.121491))
            ThreePointArc((-117.674281, -93.121491), (-113.6963370681, -79.0172308939), (-106.7380779846, -66.1200677017))
            ThreePointArc((-106.7380779846, -66.1200677017), (-124.3722324549, -62.28687), (-142.0063857785, -66.1200674855))
            ThreePointArc((-142.0063857785, -66.1200674855), (-135.0481279319, -79.0172308939), (-131.070184, -93.121491))
        make_face(mode=Mode.SUBTRACT)
    extrude(amount=F3_DEPTH)


solid = Compound([f1.part, f2.part, f3.part])
